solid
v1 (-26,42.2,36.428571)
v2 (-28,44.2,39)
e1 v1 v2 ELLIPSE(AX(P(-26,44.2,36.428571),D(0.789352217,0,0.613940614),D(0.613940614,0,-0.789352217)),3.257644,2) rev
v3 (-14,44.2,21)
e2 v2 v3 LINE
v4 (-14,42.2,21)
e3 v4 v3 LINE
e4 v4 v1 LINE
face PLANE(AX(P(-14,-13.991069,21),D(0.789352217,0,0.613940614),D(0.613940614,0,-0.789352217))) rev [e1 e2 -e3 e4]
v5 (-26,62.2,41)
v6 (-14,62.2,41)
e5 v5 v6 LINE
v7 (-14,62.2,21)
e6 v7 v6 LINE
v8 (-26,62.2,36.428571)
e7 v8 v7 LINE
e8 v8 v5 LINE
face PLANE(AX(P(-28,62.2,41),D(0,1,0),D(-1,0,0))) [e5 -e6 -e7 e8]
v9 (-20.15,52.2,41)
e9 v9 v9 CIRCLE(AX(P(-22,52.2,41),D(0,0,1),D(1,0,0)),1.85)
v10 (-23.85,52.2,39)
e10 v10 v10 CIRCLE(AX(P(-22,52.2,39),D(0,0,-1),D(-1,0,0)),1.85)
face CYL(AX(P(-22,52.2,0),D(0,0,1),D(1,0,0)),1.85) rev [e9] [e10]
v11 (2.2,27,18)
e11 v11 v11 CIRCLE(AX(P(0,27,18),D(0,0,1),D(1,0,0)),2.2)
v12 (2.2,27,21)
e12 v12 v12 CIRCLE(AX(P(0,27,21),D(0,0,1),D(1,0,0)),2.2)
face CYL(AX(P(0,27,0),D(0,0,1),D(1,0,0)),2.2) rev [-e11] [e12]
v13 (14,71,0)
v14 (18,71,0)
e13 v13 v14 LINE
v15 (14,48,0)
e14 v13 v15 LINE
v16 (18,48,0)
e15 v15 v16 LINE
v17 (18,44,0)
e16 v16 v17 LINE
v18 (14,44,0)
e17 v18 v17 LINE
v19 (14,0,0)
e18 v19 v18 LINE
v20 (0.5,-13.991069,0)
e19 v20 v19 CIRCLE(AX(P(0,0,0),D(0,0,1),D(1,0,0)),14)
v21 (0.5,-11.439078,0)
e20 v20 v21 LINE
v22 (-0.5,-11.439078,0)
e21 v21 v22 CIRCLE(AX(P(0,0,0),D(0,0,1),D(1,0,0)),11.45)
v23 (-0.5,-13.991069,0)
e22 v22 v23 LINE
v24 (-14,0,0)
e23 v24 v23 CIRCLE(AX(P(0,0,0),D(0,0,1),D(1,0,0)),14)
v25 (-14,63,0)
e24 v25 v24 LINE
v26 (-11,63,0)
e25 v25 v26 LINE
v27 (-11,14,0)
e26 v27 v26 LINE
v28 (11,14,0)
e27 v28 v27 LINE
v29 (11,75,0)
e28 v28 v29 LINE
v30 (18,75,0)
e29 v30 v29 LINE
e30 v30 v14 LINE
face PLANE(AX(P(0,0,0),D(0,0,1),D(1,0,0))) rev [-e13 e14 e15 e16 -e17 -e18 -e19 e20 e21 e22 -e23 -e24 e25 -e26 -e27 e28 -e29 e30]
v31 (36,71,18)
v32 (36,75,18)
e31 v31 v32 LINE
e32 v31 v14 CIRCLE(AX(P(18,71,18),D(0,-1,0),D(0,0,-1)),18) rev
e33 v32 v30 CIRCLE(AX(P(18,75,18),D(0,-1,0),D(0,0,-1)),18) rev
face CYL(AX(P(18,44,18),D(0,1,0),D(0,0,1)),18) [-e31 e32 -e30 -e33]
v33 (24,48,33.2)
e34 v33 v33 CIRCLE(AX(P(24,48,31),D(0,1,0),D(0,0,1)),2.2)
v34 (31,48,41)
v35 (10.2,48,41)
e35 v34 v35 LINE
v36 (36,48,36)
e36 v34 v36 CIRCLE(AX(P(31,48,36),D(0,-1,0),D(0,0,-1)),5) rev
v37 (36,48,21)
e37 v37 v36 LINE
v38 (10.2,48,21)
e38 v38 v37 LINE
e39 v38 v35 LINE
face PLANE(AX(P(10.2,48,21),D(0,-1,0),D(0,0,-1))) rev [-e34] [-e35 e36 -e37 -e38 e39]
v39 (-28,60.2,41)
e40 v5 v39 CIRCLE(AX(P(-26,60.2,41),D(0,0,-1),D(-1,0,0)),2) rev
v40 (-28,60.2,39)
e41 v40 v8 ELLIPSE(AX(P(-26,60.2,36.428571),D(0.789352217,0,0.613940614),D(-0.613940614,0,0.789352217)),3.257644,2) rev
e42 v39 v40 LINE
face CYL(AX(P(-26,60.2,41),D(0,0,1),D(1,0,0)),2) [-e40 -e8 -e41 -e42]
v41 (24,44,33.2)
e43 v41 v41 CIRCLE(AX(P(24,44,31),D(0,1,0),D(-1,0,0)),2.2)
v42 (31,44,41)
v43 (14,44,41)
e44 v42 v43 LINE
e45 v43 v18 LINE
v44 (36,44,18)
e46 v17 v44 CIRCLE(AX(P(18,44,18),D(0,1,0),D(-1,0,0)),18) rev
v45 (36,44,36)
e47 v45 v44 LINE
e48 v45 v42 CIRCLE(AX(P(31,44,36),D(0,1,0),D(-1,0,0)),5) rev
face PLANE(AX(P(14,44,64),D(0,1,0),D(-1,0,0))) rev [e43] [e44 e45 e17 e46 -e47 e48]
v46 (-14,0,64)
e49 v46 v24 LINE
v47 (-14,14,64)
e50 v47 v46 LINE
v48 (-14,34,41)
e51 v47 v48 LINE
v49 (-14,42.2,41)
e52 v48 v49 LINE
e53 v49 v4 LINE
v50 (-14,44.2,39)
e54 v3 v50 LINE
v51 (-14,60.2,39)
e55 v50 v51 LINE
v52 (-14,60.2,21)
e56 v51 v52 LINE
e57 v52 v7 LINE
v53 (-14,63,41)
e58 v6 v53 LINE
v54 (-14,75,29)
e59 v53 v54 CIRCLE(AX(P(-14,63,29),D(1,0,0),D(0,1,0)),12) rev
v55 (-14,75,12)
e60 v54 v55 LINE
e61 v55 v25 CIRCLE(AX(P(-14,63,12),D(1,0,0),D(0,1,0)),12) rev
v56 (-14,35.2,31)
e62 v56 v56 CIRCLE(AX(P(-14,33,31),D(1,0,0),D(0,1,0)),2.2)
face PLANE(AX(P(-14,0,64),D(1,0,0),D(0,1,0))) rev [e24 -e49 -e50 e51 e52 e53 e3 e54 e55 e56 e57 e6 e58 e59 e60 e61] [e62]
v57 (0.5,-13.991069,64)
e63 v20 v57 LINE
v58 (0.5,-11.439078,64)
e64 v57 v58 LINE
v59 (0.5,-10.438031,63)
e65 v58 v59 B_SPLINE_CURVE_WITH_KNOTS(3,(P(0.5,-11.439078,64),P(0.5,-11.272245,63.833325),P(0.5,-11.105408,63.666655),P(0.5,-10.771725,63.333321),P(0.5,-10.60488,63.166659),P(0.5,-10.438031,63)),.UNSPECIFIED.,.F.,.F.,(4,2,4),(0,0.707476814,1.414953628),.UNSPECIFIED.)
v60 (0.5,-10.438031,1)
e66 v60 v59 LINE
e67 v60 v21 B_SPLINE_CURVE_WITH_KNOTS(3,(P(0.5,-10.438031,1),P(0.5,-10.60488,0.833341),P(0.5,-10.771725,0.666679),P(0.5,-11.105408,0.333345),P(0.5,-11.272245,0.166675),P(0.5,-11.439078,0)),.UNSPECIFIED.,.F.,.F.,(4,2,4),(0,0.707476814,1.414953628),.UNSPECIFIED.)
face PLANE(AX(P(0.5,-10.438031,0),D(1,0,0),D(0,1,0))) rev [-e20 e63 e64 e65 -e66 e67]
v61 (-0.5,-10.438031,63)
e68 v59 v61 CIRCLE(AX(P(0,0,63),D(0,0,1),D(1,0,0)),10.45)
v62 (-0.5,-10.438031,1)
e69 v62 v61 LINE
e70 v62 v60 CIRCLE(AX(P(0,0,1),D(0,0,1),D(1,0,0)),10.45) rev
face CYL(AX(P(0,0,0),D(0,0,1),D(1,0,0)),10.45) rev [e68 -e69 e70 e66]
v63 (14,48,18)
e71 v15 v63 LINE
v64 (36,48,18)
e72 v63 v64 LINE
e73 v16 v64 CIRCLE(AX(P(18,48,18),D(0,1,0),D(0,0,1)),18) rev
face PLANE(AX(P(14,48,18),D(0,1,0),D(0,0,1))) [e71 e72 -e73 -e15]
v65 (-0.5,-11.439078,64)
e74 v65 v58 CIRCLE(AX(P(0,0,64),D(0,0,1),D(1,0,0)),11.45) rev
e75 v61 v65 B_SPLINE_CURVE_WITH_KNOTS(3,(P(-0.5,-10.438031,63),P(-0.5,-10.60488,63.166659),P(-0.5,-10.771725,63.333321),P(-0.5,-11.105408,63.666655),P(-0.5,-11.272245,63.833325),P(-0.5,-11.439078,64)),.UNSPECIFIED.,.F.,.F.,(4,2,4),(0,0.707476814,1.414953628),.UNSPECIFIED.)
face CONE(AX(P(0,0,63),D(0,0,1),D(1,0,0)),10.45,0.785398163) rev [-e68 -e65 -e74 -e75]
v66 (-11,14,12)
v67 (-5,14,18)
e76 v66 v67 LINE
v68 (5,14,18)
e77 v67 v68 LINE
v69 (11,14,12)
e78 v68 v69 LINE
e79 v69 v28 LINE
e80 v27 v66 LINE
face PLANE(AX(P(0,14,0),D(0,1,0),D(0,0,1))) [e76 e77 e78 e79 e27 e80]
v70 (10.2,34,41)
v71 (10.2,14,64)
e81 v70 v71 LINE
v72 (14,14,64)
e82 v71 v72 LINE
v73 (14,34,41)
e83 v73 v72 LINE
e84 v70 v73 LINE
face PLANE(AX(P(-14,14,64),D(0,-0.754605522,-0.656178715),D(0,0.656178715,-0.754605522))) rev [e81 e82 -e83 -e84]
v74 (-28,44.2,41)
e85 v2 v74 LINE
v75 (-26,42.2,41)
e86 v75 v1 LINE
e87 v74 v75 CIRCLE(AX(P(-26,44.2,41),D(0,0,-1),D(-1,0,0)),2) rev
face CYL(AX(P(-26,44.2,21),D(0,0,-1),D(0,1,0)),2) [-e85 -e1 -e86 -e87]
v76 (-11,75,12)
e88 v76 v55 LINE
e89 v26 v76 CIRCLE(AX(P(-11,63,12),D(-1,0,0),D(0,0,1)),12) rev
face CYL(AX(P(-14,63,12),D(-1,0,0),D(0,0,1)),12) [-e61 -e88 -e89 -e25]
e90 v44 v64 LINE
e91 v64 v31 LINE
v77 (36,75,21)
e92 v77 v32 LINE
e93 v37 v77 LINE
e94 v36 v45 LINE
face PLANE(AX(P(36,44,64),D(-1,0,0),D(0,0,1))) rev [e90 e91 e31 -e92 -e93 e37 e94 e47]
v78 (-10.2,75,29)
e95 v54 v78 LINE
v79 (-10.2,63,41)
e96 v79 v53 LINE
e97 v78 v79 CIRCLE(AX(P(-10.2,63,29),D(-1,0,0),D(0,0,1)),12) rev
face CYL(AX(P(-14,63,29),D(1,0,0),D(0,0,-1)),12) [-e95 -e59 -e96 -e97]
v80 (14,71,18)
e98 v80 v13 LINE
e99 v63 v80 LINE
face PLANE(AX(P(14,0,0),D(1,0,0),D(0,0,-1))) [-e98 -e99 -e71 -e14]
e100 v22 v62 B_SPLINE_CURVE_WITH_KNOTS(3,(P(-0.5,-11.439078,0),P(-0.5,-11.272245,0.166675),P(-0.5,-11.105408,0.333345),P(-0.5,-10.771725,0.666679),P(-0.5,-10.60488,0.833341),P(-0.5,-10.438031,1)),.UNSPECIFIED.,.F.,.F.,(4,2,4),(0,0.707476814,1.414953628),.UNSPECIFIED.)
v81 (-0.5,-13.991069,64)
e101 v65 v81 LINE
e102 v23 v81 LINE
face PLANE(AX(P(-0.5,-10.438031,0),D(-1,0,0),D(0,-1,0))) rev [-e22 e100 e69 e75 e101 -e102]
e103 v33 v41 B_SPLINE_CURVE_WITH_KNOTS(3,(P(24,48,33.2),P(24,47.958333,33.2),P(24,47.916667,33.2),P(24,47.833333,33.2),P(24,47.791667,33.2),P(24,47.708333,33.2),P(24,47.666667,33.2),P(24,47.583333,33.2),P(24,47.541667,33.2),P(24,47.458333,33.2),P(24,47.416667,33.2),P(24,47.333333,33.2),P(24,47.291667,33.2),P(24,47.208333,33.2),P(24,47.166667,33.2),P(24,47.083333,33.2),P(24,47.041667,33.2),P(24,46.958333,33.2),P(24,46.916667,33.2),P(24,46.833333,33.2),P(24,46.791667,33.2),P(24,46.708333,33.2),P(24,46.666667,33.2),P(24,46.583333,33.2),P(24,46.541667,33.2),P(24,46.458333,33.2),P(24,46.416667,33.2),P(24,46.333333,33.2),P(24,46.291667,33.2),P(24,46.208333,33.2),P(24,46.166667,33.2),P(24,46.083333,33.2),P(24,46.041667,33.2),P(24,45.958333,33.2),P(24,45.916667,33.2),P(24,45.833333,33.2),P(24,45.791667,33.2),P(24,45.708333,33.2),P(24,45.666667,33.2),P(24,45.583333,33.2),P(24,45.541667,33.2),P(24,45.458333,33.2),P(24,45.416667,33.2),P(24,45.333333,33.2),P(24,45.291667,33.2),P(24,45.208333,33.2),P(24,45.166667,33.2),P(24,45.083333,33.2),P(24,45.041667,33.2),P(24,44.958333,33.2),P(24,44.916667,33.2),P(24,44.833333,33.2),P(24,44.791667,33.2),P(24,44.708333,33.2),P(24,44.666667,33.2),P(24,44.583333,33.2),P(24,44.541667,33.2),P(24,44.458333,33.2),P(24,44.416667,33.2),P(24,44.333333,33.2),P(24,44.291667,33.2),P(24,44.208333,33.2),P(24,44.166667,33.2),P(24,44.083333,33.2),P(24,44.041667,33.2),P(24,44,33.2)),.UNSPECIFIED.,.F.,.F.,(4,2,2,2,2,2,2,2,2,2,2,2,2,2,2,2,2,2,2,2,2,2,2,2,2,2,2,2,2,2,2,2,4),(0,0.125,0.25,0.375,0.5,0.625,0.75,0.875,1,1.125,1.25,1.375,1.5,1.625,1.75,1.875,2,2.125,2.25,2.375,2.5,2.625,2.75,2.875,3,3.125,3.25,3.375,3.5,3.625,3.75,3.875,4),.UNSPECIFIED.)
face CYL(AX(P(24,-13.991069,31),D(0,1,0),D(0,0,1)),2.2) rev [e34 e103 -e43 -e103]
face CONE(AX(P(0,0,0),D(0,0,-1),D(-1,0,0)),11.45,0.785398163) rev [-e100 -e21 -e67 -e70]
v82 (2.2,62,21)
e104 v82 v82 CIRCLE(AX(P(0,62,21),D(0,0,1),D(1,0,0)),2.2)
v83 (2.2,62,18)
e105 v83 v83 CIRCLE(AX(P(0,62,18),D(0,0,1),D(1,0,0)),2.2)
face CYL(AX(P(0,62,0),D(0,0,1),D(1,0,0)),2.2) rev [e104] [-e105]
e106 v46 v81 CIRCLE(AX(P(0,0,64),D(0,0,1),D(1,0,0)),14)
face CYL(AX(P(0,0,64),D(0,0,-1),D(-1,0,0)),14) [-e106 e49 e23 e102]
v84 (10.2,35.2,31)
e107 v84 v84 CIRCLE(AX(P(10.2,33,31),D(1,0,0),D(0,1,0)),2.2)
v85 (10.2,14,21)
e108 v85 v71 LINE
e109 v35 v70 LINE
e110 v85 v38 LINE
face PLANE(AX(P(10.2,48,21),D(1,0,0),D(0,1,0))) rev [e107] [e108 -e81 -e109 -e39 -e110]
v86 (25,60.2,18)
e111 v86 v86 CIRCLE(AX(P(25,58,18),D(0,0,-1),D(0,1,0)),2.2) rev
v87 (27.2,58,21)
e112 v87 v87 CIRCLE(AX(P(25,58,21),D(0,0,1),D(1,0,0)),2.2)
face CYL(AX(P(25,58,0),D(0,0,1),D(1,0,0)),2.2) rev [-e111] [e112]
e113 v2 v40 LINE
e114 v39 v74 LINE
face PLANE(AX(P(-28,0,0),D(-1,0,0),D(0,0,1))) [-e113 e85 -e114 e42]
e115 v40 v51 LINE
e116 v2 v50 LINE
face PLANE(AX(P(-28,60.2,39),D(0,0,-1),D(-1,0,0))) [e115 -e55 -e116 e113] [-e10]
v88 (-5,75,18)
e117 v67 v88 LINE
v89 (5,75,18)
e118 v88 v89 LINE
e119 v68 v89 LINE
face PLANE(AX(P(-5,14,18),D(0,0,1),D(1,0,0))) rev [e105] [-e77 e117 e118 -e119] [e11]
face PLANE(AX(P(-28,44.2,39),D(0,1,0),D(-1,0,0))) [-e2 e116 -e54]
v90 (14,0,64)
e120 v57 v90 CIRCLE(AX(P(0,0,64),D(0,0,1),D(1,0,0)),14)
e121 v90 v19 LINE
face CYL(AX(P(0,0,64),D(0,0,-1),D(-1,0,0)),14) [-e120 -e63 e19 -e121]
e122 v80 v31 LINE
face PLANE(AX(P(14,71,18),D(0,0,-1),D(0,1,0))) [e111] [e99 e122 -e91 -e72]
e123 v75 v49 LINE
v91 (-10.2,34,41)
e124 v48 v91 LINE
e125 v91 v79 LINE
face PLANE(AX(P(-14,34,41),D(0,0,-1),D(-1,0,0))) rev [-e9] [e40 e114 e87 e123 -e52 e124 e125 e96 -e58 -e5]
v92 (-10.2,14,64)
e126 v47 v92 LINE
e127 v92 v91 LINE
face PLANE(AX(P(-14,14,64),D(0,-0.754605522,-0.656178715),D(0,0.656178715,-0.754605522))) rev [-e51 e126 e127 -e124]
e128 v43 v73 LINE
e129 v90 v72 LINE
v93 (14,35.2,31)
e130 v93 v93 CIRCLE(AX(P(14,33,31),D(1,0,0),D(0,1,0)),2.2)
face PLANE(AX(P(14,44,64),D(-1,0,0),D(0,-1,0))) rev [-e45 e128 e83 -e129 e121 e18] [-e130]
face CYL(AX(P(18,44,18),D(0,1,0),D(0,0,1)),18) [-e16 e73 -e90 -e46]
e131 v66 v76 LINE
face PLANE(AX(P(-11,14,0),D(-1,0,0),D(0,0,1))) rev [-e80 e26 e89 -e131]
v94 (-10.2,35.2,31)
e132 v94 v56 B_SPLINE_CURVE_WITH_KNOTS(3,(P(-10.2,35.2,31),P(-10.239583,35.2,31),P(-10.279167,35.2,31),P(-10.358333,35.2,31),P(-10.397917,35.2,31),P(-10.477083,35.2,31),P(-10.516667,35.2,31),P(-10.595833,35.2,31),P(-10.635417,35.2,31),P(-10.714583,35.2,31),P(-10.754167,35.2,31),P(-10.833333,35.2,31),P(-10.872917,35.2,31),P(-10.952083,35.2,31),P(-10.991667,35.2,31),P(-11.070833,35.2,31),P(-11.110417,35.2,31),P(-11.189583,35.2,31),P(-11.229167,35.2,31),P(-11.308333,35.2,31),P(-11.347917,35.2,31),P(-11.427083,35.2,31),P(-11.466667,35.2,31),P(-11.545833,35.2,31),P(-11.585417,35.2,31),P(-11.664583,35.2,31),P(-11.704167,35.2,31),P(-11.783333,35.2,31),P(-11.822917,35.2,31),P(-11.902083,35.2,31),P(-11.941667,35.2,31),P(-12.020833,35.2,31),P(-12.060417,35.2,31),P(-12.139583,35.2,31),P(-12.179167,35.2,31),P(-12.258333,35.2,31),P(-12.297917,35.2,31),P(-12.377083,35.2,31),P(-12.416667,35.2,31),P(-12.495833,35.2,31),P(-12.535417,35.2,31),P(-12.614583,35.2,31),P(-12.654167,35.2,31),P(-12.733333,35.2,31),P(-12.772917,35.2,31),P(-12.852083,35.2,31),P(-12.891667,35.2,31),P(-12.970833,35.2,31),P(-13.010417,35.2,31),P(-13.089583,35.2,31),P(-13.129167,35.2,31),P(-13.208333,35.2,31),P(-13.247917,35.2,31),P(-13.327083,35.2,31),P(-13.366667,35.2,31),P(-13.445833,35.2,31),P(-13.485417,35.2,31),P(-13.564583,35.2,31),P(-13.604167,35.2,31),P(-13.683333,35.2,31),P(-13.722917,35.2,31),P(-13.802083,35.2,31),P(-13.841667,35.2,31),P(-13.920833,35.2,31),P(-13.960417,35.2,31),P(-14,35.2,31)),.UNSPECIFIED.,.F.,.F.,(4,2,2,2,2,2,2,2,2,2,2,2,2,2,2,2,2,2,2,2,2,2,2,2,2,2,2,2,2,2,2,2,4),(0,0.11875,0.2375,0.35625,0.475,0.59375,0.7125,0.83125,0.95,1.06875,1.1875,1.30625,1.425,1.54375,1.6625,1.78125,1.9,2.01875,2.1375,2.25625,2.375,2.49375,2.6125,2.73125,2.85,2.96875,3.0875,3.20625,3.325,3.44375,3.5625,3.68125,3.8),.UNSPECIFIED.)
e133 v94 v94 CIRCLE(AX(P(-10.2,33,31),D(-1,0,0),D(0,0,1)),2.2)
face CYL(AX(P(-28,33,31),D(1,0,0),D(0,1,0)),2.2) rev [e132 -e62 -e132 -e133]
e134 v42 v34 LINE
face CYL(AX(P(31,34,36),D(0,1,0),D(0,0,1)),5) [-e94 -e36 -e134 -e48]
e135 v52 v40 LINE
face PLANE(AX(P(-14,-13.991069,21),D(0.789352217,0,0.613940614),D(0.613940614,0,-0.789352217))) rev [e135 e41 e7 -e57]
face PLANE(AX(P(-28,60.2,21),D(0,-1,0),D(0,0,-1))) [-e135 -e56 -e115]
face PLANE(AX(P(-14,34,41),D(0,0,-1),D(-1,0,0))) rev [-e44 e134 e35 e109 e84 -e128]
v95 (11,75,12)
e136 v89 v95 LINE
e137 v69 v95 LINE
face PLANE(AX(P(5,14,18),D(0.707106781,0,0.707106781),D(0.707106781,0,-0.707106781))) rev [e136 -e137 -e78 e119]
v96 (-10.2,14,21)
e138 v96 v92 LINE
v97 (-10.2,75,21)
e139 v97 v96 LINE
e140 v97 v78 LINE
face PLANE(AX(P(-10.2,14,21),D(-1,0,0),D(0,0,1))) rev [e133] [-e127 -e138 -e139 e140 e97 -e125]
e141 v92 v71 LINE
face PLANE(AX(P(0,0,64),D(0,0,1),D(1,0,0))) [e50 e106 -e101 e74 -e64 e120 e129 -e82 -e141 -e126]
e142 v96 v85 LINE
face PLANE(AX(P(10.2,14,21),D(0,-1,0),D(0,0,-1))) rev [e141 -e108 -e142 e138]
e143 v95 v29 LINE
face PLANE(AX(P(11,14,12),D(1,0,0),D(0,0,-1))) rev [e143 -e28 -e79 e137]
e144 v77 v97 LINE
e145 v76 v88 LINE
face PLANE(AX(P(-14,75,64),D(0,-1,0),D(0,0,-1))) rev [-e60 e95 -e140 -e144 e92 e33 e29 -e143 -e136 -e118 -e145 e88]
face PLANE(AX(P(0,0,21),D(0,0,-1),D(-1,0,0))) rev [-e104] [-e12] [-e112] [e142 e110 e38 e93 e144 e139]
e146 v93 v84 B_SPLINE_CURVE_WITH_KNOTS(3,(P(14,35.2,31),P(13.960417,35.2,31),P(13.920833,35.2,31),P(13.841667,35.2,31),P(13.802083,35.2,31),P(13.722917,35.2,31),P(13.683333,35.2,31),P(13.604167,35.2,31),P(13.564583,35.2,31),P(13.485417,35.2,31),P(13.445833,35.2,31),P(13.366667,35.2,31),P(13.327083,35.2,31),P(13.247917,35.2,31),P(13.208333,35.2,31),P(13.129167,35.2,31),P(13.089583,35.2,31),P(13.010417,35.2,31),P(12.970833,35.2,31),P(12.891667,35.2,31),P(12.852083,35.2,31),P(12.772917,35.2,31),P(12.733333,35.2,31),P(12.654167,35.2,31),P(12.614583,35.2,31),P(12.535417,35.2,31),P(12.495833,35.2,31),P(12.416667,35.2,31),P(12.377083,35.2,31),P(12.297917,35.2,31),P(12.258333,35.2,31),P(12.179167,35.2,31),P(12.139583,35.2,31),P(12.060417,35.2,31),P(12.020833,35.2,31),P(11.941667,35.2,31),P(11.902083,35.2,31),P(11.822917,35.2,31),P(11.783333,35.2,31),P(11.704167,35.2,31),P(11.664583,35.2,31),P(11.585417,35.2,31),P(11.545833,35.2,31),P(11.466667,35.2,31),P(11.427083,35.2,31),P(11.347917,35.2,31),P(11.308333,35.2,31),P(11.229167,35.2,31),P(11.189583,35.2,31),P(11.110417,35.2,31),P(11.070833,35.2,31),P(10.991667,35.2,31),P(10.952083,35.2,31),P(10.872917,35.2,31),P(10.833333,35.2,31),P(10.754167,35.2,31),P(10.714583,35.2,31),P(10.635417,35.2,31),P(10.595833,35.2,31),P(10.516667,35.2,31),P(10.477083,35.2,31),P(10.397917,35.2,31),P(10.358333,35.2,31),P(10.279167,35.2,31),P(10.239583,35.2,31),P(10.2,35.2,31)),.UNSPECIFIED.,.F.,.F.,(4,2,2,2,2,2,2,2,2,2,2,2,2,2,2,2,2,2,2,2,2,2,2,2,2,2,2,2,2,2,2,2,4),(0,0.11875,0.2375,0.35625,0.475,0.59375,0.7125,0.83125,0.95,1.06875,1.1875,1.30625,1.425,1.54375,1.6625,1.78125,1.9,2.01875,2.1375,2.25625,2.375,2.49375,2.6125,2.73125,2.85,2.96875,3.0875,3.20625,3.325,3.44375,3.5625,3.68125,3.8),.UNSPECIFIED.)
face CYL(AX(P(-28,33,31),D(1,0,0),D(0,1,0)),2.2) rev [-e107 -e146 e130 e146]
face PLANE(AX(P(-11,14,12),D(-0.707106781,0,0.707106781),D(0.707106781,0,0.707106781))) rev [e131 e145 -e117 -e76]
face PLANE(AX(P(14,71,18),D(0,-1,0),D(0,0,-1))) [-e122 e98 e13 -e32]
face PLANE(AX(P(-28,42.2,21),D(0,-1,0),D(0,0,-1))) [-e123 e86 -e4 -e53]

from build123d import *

# Parameters (mm, degrees)
BOSS_EXTRUDE1_DEPTH     = 64
CUT_EXTRUDE1_DEPTH      = 61
CUT_EXTRUDE2_DEPTH      = 103.493902258
CUT_EXTRUDE2_DEPTH_BACK = 103.493902258
CUT_EXTRUDE3_DEPTH      = 43
CUT_EXTRUDE4_DEPTH      = 105.961897849
CHAMFER1_SIZE           = 1
SKETCH6_R               = 2.2
CUT_EXTRUDE5_DEPTH      = 94.648278148
BOSS_EXTRUDE2_DEPTH     = 14
CUT_EXTRUDE6_DEPTH      = 106.81625079
SKETCH9_R               = 1.85
CUT_EXTRUDE7_DEPTH      = 93.746967605
FILLET1_R               = 2
FILLET2_R               = 12
SKETCH10_R              = 2.2
CUT_EXTRUDE8_DEPTH      = 108.168092266
FILLET3_R               = 5
FILLET4_START           = 44
FILLET4_DEPTH           = 31
SKETCH11_R              = 2.2
CUT_EXTRUDE9_DEPTH      = 97.098348533
SKETCH12_W              = 18
SKETCH12_H              = 23
CUT_EXTRUDE10_DEPTH     = 22


with BuildPart() as part:
    # Sketch1 → Boss-Extrude1 (new body)
    with BuildSketch(Plane.XY):
        with BuildLine():
            Line((-14, 0), (-14, 75))
            Line((-14, 75), (36, 75))
            Line((36, 75), (36, 44))
            Line((36, 44), (14, 44))
            Line((14, 44), (14, 0))
            ThreePointArc((14, 0), (0, -14), (-14, 0))
        make_face()
    extrude(amount=BOSS_EXTRUDE1_DEPTH)

    # Sketch2 → Cut-Extrude1 (cut)
    with BuildSketch(Plane(origin=(0, 75, 0), x_dir=(1, 0, 0), z_dir=(0, 1, 0))):
        Polygon((-11, 0), (-11, -12), (-5, -18), (5, -18), (11, -12), (11, 0), align=None)
    extrude(amount=-CUT_EXTRUDE1_DEPTH, mode=Mode.SUBTRACT)

    # Sketch3 → Cut-Extrude2 (cut, two sides: drawn at the far end of the back side and taken through both)
    with BuildSketch(Plane(origin=(14, 0, 0), x_dir=(0, 0, -1), z_dir=(1, 0, 0)).offset(-CUT_EXTRUDE2_DEPTH_BACK)):
        Polygon((-64, 14), (-41, 34), (-41, 75), (-64, 75), align=None)
    extrude(amount=CUT_EXTRUDE2_DEPTH + CUT_EXTRUDE2_DEPTH_BACK, mode=Mode.SUBTRACT)

    # Sketch4 → Cut-Extrude3 (cut)
    with BuildSketch(Plane.XY.offset(64)):
        Polygon((-10.2, 14), (-10.2, 75), (36, 75), (36, 48), (10.2, 48), (10.2, 14), align=None)
    extrude(amount=-CUT_EXTRUDE3_DEPTH, mode=Mode.SUBTRACT)

    # Sketch5 → Cut-Extrude4 (cut, through all)
    with BuildSketch(Plane.XY.offset(64)):
        with BuildLine():
            Line((-0.5, -10.438031424), (-0.5, -13.99106858))
            ThreePointArc((-0.5, -13.99106858), (0, -14), (0.5, -13.99106858))
            Line((0.5, -13.99106858), (0.5, -10.438031424))
            ThreePointArc((0.5, -10.438031424), (0, 10.45), (-0.5, -10.438031424))
        make_face()
    extrude(amount=-CUT_EXTRUDE4_DEPTH, mode=Mode.SUBTRACT)

    # Chamfer1
    chamfer1_edges = [part.edges().sort_by_distance(p)[0] for p in [
        (0, 10.45, 0),
        (0, 10.45, 64),
    ]]
    chamfer(chamfer1_edges, length=CHAMFER1_SIZE)

    # Sketch6 → Cut-Extrude5 (cut, through all)
    with BuildSketch(Plane.XY.offset(21)):
        with Locations((0, 62)):
            Circle(SKETCH6_R)
        with Locations((0, 27)):
            Circle(SKETCH6_R)
        with Locations((25, 58)):
            Circle(SKETCH6_R)
    extrude(amount=-CUT_EXTRUDE5_DEPTH, mode=Mode.SUBTRACT)

    # Sketch7 → Boss-Extrude2 (add)
    with BuildSketch(Plane(origin=(-14, 0, 0), x_dir=(0, 0, -1), z_dir=(1, 0, 0))):
        Polygon((-41, 62.2), (-21, 62.2), (-21, 60.2), (-39, 60.2), (-39, 44.2), (-21, 44.2), (-21, 42.2), (-41, 42.2), align=None)
    extrude(amount=-BOSS_EXTRUDE2_DEPTH)

    # Sketch8 → Cut-Extrude6 (cut, through all)
    with BuildSketch(Plane(origin=(0, 62.2, 0), x_dir=(1, 0, 0), z_dir=(0, 1, 0))):
        Polygon((-14, -21), (-28, -39), (-28, -21), align=None)
    extrude(amount=-CUT_EXTRUDE6_DEPTH, mode=Mode.SUBTRACT)

    # Sketch9 → Cut-Extrude7 (cut, through all)
    with BuildSketch(Plane.XY.offset(41)):
        with Locations((-22, 52.2)):
            Circle(SKETCH9_R)
    extrude(amount=-CUT_EXTRUDE7_DEPTH, mode=Mode.SUBTRACT)

    # Fillet1
    fillet1_edges = [part.edges().sort_by_distance(p)[0] for p in [
        (-28, 42.2, 40),
        (-28, 62.2, 40),
    ]]
    fillet(fillet1_edges, radius=FILLET1_R)

    # Fillet2
    fillet2_edges = [part.edges().sort_by_distance(p)[0] for p in [
        (-12.1, 75, 41),
        (-12.5, 75, 0),
    ]]
    fillet(fillet2_edges, radius=FILLET2_R)

    # Sketch10 → Cut-Extrude8 (cut, through all)
    with BuildSketch(Plane(origin=(14, 0, 0), x_dir=(0, 0, -1), z_dir=(1, 0, 0))):
        with Locations(Location((-31, 33, 0), (0, 0, 90))):
            Circle(SKETCH10_R)
    extrude(amount=-CUT_EXTRUDE8_DEPTH, mode=Mode.SUBTRACT)

    # Fillet3
    fillet3_edges = [part.edges().sort_by_distance(p)[0] for p in [
        (36, 46, 41),
    ]]
    fillet(fillet3_edges, radius=FILLET3_R)

    # Fillet4: read off the stored shape, not the designer's step
    # Fillet4 outline → Fillet4 (cut)
    with BuildSketch(Plane(origin=(0, 0, 0), x_dir=(1, 0, 0), z_dir=(0, 1, 0)).offset(FILLET4_START)):
        with BuildLine():
            ThreePointArc((18, 0), (30.727922061, -5.272077939), (36, -18))
            Line((36, -18), (36, 0))
            Line((36, 0), (18, 0))
        make_face()
    extrude(amount=FILLET4_DEPTH, mode=Mode.SUBTRACT)

    # Sketch11 → Cut-Extrude9 (cut, through all)
    with BuildSketch(Plane(origin=(0, 48, 0), x_dir=(1, 0, 0), z_dir=(0, 1, 0))):
        with Locations(Location((24, -31, 0), (0, 0, 270))):
            Circle(SKETCH11_R)
    extrude(amount=-CUT_EXTRUDE9_DEPTH, mode=Mode.SUBTRACT)

    # Sketch12 → Cut-Extrude10 (cut)
    with BuildSketch(Plane.ZY.offset(-36)):
        with Locations((9, 59.5)):
            Rectangle(SKETCH12_W, SKETCH12_H)
    extrude(amount=CUT_EXTRUDE10_DEPTH, mode=Mode.SUBTRACT)


solid = part.part
